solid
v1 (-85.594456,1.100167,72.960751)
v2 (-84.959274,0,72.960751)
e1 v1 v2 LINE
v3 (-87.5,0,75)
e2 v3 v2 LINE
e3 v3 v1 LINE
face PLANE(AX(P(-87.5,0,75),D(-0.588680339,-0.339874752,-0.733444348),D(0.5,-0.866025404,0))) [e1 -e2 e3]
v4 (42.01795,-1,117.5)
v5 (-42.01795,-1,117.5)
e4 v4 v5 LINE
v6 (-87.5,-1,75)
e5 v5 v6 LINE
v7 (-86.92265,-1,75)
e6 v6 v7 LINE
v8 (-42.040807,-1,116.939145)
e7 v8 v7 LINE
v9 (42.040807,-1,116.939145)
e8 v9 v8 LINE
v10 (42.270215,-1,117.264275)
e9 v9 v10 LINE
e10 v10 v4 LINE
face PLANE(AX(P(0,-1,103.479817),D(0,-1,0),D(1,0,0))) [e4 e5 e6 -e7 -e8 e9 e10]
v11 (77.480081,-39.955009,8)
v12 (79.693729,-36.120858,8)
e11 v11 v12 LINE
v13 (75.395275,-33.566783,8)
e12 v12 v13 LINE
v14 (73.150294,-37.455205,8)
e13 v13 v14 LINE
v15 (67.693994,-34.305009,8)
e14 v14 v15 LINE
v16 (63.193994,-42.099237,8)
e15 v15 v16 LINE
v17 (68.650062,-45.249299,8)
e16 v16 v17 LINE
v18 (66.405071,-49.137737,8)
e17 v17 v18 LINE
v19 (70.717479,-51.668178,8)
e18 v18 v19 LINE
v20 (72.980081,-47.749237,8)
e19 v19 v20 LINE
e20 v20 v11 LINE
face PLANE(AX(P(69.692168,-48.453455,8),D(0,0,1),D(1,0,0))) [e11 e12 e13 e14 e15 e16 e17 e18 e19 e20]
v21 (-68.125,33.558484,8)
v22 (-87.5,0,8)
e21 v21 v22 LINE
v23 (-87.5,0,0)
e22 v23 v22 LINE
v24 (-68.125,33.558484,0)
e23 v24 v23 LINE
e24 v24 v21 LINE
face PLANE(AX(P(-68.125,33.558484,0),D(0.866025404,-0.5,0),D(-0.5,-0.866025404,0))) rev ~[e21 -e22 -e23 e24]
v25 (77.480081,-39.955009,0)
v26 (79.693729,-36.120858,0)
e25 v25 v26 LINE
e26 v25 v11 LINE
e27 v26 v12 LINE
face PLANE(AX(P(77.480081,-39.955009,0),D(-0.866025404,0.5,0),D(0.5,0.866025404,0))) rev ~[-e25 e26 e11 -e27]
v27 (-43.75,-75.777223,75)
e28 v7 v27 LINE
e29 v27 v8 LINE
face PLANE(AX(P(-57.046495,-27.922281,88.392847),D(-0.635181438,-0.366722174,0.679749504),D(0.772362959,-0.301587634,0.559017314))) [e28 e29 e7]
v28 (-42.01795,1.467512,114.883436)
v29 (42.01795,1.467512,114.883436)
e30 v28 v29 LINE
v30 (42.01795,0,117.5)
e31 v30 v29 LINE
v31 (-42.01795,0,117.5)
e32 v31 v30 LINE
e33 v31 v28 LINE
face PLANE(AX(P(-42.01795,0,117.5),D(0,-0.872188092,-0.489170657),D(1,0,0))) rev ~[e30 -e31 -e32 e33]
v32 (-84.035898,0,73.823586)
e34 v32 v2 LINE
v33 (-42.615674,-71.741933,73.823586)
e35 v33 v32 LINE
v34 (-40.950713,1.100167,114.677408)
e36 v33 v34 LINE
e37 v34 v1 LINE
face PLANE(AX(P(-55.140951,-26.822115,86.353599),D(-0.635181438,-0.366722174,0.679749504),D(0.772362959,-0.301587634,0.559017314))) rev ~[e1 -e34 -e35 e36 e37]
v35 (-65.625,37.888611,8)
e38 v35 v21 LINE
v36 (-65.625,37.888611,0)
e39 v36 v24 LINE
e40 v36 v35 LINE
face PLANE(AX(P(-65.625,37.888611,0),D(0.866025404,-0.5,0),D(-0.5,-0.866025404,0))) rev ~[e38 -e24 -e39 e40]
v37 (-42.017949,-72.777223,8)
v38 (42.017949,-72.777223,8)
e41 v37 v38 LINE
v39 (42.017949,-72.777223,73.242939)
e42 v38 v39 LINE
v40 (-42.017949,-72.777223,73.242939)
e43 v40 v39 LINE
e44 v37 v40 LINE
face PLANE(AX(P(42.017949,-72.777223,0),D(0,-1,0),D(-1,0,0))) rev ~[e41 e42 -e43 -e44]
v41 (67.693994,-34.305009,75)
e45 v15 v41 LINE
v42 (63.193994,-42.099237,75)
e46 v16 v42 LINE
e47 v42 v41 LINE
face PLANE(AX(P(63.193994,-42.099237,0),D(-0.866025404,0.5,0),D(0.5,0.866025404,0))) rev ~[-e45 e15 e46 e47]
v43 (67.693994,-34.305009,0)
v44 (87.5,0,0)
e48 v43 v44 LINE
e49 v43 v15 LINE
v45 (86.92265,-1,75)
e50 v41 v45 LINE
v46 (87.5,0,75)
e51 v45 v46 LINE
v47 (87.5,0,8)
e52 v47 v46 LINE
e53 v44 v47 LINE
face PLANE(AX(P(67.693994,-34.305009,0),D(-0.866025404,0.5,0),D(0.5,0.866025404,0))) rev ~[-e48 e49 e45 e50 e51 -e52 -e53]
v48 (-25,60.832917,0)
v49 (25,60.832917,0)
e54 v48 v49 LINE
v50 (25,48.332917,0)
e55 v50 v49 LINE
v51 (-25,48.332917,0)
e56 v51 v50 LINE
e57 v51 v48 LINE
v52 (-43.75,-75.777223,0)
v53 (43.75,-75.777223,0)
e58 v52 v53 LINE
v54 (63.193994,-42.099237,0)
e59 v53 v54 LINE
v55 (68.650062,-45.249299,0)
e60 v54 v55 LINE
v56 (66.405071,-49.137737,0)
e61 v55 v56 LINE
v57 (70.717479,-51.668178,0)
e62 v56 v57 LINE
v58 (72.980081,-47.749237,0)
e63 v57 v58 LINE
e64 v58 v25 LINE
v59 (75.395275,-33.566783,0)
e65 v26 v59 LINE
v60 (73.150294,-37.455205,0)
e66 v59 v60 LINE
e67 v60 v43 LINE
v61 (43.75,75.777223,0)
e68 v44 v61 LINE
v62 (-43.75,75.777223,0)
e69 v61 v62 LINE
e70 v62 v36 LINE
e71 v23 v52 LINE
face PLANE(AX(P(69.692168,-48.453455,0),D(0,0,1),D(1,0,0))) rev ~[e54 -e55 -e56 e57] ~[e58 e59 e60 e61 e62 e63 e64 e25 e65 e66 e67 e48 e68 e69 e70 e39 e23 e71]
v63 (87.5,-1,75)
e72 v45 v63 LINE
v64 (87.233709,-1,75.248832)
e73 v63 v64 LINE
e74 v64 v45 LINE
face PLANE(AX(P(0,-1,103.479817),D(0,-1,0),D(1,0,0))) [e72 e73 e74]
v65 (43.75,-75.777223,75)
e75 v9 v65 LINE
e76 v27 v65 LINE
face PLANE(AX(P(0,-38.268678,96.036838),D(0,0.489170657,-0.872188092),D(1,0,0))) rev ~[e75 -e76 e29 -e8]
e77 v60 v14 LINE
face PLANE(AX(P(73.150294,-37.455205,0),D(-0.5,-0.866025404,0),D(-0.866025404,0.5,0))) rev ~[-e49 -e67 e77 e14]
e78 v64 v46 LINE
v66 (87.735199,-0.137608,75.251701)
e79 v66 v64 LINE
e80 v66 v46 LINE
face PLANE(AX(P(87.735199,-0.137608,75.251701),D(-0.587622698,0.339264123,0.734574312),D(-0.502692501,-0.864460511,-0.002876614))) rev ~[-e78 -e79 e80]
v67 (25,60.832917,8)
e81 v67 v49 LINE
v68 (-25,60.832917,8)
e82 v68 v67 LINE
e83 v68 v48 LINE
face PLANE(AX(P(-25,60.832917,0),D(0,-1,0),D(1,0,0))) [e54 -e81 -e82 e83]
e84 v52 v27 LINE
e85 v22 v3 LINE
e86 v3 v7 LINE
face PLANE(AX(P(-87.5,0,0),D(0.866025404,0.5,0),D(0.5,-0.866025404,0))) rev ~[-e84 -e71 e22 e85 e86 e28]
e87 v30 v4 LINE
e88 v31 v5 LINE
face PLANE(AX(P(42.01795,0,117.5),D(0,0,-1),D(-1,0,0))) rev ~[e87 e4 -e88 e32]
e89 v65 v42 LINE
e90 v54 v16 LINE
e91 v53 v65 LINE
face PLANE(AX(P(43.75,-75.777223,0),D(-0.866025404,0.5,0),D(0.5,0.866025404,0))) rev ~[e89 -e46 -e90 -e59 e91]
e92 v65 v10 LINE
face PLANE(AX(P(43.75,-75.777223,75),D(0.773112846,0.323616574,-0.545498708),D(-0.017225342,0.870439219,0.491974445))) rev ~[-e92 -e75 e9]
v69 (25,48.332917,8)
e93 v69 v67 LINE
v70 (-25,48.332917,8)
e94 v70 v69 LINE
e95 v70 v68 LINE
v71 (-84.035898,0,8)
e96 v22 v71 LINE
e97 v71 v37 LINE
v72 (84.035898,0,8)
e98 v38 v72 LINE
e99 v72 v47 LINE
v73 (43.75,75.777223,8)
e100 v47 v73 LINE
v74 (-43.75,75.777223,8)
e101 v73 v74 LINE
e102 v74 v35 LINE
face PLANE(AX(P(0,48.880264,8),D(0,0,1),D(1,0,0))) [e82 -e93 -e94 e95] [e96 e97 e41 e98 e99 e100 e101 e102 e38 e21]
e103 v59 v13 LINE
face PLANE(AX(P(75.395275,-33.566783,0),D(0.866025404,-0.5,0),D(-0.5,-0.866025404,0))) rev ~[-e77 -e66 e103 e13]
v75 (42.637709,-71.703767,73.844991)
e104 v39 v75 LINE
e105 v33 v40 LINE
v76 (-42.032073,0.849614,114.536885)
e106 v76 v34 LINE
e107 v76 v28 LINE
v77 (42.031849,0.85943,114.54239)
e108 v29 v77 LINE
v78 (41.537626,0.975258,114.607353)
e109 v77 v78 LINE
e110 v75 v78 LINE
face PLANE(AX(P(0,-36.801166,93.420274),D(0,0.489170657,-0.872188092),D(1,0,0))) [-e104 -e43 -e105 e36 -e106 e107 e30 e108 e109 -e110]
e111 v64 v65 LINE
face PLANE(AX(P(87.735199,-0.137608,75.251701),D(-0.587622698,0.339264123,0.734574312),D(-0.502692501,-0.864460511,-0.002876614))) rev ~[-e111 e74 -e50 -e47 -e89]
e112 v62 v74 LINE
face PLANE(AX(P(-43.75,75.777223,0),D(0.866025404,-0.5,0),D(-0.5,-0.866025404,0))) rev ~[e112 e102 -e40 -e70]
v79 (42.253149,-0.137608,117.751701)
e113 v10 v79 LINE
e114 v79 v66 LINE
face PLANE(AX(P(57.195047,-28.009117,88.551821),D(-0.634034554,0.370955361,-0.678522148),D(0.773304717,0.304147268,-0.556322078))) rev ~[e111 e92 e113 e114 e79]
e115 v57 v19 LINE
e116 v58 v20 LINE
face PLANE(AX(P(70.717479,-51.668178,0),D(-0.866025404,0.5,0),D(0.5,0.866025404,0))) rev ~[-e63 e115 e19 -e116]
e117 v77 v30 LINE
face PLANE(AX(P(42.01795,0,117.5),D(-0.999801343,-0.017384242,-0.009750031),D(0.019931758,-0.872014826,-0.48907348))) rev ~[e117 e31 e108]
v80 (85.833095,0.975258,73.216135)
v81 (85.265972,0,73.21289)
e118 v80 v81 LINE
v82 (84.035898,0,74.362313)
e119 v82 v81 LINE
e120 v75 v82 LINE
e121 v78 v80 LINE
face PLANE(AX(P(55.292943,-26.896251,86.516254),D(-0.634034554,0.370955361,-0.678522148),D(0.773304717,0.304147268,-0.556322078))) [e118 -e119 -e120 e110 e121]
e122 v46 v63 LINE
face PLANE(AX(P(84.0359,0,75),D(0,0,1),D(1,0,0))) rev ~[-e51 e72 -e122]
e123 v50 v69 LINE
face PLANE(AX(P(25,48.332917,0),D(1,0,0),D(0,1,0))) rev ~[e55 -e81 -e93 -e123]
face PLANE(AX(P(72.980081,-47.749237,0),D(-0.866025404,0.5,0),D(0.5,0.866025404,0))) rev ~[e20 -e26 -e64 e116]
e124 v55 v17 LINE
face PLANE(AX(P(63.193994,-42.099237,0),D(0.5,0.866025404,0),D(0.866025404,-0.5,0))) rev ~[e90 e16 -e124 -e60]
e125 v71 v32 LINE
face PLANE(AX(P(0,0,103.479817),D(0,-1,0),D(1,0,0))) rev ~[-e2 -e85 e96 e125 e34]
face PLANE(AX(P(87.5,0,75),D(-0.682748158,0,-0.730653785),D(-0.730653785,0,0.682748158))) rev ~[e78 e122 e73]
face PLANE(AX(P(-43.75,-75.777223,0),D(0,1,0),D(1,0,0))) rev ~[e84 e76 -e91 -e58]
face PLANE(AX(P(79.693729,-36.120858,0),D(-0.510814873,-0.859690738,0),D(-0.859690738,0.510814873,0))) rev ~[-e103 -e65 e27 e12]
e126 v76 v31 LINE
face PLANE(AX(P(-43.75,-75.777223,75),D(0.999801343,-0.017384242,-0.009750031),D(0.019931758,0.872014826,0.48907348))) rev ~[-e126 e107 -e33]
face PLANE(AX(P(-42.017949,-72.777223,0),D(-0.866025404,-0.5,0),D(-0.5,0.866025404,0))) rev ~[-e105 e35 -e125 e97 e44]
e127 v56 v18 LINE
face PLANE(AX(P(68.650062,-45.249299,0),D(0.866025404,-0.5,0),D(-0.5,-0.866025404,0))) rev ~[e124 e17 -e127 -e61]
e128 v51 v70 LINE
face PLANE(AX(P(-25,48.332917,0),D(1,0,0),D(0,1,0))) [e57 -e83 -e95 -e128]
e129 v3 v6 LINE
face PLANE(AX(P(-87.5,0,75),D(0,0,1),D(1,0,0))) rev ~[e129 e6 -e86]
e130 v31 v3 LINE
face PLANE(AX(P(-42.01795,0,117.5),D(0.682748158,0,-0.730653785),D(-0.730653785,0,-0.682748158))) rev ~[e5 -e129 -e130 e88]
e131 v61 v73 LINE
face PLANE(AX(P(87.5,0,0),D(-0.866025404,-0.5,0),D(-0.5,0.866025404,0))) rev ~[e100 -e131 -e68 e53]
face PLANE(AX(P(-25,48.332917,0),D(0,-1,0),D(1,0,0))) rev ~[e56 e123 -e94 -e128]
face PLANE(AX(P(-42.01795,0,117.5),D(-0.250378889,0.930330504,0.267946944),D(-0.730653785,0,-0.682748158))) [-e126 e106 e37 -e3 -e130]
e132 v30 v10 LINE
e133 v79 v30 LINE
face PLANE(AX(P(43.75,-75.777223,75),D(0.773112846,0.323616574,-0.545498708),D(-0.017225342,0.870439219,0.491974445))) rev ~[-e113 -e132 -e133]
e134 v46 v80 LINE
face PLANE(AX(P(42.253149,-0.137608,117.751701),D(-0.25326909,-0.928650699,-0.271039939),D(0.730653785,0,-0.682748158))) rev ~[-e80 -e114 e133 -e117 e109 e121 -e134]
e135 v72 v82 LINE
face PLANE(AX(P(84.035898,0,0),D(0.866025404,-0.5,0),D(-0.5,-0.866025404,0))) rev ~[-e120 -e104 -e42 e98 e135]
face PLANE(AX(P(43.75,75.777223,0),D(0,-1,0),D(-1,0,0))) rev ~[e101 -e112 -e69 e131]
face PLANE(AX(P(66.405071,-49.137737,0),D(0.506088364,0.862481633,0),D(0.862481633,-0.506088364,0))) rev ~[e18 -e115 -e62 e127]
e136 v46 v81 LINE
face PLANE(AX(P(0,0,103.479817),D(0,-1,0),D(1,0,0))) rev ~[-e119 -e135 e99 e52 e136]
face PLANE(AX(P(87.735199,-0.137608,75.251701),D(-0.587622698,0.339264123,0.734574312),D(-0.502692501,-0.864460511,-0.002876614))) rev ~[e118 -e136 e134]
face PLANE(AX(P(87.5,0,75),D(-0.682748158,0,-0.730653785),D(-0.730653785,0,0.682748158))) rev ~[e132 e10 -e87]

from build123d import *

# Parameters (mm, degrees)
F0_W      = 50
F0_H      = 12.5
F1_DEPTH  = 8
F2_DEPTH  = 75
F4_DEPTH  = 8
F7_DEPTH  = 3
F8_DEPTH  = 1
F11_DEPTH = 3
F14_DEPTH = 3
F15_DEPTH = 8
F16_DEPTH = 8
F17_DEPTH = 12.5
F18_DEPTH = 8


# Not quite as in the source:
# - a feature names something its author has since deleted; it is built from what else it names


with BuildPart() as f1:
    # F0 (on Top) → F1 (new body)
    with BuildSketch(Plane.XY):
        Polygon((42.0179491924, -72.7772228311), (84.0358983849, 0), (42.0179491924, 72.7772228311), (-42.0179491924, 72.7772228311), (-84.0358983849, 0), (-42.0179491924, -72.7772228311), align=None)
        with Locations((0, 54.5829171234)):
            Rectangle(F0_W, F0_H, mode=Mode.SUBTRACT)
    extrude(amount=F1_DEPTH)

    # F0 (on Top) → F2 (join)
    with BuildSketch(Plane.XY):
        Polygon((67.6939940411, -34.3050086158), (87.5, 0), (84.0358983849, 0), (42.0179491924, -72.7772228311), (-42.0179491924, -72.7772228311), (-84.0358983849, 0), (-87.5, 0), (-43.75, -75.7772228311), (43.75, -75.7772228311), (63.1939940411, -42.0992372499), align=None)
    extrude(amount=F2_DEPTH)

    # F0 (on Top) → F4 (join)
    with BuildSketch(Plane.XY):
        Polygon((43.75, 75.7772228311), (-43.75, 75.7772228311), (-65.625, 37.8886114156), (-68.125, 33.5584843966), (-87.5, 0), (-84.0358983849, 0), (-42.0179491924, 72.7772228311), (42.0179491924, 72.7772228311), (84.0358983849, 0), (87.5, 0), align=None)
    extrude(amount=F4_DEPTH)

    # F6 (on face) → F7 (join)
    with BuildSketch(Plane(origin=(0, -50.1312366318, 89.3836679776), x_dir=(1, 0, 0), z_dir=(0, 0.4891706574, -0.872188092))):
        Polygon((43.75, 29.4041920927), (0, 29.4041920927), (-43.75, 29.4041920927), (-42.01795, -57.4775522498), (42.01795, -57.4775522498), align=None)
    extrude(amount=F7_DEPTH)

    # F3 (on Front) → F8 (join)
    with BuildSketch(Plane.XZ):
        Polygon((-42.01795, 114.5), (0, 114.5), (42.01795, 114.5), (84.0359, 75), (87.5, 75), (42.01795, 117.5), (0, 117.5), (-42.01795, 117.5), (-87.5, 75), (-84.0359, 75), align=None)
    extrude(amount=F8_DEPTH)

    # F10 (on face) → F11 (join)
    with BuildSketch(Plane(origin=(-67.6846727043, -39.0777640058, 72.4338274863), x_dir=(0.7723629594, -0.3015876344, 0.5590173143), z_dir=(-0.6351814378, -0.3667221741, 0.6797495039))):
        Polygon((33.2314262259, 55.789645187), (-25.6554603702, 35.6104118215), (30.9888924807, -31.0804218073), align=None)
    extrude(amount=-F11_DEPTH)

    # F13 (on face) → F14 (join)
    with BuildSketch(Plane(origin=(67.6756688636, -39.5950852503, 72.4241918832), x_dir=(0.7733047167, 0.3041472681, -0.556322078), z_dir=(-0.6340345536, 0.3709553614, -0.6785221475))):
        Polygon((-30.939509805, 30.5117392321), (-32.8751652468, -56.3649154418), (25.9400068576, -35.9776056011), align=None)
    extrude(amount=F14_DEPTH)

    # F0 (on Top) → F15 (join)
    with BuildSketch(Plane.XY):
        with Locations((0, 54.5829171234)):
            Rectangle(F0_W, F0_H)
    extrude(amount=F15_DEPTH)

    # F0 (on Top) → F16 (join)
    with BuildSketch(Plane.XY):
        Polygon((75.395275497, -33.566783298), (73.1502941936, -37.4552049777), (77.4800811039, -39.9550086158), (79.6937291893, -36.1208576617), align=None)
        Polygon((73.1502941936, -37.4552049777), (67.6939940411, -34.3050086158), (63.1939940411, -42.0992372499), (68.6500615294, -45.249299283), (72.9800811039, -47.7492372499), (77.4800811039, -39.9550086158), align=None)
    extrude(amount=F16_DEPTH)

    # F0 (on Top) → F17 (cut, symmetric)
    with BuildSketch(Plane.XY):
        with Locations((0, 54.5829171234)):
            Rectangle(F0_W, F0_H)
    extrude(amount=F17_DEPTH, both=True, mode=Mode.SUBTRACT)

    # F0 (on Top) → F18 (join)
    with BuildSketch(Plane.XY):
        Polygon((72.9800811039, -47.7492372499), (68.6500615294, -45.249299283), (66.405071243, -49.1377365216), (70.7174794095, -51.6681783419), align=None)
    extrude(amount=F18_DEPTH)


solid = f1.part
